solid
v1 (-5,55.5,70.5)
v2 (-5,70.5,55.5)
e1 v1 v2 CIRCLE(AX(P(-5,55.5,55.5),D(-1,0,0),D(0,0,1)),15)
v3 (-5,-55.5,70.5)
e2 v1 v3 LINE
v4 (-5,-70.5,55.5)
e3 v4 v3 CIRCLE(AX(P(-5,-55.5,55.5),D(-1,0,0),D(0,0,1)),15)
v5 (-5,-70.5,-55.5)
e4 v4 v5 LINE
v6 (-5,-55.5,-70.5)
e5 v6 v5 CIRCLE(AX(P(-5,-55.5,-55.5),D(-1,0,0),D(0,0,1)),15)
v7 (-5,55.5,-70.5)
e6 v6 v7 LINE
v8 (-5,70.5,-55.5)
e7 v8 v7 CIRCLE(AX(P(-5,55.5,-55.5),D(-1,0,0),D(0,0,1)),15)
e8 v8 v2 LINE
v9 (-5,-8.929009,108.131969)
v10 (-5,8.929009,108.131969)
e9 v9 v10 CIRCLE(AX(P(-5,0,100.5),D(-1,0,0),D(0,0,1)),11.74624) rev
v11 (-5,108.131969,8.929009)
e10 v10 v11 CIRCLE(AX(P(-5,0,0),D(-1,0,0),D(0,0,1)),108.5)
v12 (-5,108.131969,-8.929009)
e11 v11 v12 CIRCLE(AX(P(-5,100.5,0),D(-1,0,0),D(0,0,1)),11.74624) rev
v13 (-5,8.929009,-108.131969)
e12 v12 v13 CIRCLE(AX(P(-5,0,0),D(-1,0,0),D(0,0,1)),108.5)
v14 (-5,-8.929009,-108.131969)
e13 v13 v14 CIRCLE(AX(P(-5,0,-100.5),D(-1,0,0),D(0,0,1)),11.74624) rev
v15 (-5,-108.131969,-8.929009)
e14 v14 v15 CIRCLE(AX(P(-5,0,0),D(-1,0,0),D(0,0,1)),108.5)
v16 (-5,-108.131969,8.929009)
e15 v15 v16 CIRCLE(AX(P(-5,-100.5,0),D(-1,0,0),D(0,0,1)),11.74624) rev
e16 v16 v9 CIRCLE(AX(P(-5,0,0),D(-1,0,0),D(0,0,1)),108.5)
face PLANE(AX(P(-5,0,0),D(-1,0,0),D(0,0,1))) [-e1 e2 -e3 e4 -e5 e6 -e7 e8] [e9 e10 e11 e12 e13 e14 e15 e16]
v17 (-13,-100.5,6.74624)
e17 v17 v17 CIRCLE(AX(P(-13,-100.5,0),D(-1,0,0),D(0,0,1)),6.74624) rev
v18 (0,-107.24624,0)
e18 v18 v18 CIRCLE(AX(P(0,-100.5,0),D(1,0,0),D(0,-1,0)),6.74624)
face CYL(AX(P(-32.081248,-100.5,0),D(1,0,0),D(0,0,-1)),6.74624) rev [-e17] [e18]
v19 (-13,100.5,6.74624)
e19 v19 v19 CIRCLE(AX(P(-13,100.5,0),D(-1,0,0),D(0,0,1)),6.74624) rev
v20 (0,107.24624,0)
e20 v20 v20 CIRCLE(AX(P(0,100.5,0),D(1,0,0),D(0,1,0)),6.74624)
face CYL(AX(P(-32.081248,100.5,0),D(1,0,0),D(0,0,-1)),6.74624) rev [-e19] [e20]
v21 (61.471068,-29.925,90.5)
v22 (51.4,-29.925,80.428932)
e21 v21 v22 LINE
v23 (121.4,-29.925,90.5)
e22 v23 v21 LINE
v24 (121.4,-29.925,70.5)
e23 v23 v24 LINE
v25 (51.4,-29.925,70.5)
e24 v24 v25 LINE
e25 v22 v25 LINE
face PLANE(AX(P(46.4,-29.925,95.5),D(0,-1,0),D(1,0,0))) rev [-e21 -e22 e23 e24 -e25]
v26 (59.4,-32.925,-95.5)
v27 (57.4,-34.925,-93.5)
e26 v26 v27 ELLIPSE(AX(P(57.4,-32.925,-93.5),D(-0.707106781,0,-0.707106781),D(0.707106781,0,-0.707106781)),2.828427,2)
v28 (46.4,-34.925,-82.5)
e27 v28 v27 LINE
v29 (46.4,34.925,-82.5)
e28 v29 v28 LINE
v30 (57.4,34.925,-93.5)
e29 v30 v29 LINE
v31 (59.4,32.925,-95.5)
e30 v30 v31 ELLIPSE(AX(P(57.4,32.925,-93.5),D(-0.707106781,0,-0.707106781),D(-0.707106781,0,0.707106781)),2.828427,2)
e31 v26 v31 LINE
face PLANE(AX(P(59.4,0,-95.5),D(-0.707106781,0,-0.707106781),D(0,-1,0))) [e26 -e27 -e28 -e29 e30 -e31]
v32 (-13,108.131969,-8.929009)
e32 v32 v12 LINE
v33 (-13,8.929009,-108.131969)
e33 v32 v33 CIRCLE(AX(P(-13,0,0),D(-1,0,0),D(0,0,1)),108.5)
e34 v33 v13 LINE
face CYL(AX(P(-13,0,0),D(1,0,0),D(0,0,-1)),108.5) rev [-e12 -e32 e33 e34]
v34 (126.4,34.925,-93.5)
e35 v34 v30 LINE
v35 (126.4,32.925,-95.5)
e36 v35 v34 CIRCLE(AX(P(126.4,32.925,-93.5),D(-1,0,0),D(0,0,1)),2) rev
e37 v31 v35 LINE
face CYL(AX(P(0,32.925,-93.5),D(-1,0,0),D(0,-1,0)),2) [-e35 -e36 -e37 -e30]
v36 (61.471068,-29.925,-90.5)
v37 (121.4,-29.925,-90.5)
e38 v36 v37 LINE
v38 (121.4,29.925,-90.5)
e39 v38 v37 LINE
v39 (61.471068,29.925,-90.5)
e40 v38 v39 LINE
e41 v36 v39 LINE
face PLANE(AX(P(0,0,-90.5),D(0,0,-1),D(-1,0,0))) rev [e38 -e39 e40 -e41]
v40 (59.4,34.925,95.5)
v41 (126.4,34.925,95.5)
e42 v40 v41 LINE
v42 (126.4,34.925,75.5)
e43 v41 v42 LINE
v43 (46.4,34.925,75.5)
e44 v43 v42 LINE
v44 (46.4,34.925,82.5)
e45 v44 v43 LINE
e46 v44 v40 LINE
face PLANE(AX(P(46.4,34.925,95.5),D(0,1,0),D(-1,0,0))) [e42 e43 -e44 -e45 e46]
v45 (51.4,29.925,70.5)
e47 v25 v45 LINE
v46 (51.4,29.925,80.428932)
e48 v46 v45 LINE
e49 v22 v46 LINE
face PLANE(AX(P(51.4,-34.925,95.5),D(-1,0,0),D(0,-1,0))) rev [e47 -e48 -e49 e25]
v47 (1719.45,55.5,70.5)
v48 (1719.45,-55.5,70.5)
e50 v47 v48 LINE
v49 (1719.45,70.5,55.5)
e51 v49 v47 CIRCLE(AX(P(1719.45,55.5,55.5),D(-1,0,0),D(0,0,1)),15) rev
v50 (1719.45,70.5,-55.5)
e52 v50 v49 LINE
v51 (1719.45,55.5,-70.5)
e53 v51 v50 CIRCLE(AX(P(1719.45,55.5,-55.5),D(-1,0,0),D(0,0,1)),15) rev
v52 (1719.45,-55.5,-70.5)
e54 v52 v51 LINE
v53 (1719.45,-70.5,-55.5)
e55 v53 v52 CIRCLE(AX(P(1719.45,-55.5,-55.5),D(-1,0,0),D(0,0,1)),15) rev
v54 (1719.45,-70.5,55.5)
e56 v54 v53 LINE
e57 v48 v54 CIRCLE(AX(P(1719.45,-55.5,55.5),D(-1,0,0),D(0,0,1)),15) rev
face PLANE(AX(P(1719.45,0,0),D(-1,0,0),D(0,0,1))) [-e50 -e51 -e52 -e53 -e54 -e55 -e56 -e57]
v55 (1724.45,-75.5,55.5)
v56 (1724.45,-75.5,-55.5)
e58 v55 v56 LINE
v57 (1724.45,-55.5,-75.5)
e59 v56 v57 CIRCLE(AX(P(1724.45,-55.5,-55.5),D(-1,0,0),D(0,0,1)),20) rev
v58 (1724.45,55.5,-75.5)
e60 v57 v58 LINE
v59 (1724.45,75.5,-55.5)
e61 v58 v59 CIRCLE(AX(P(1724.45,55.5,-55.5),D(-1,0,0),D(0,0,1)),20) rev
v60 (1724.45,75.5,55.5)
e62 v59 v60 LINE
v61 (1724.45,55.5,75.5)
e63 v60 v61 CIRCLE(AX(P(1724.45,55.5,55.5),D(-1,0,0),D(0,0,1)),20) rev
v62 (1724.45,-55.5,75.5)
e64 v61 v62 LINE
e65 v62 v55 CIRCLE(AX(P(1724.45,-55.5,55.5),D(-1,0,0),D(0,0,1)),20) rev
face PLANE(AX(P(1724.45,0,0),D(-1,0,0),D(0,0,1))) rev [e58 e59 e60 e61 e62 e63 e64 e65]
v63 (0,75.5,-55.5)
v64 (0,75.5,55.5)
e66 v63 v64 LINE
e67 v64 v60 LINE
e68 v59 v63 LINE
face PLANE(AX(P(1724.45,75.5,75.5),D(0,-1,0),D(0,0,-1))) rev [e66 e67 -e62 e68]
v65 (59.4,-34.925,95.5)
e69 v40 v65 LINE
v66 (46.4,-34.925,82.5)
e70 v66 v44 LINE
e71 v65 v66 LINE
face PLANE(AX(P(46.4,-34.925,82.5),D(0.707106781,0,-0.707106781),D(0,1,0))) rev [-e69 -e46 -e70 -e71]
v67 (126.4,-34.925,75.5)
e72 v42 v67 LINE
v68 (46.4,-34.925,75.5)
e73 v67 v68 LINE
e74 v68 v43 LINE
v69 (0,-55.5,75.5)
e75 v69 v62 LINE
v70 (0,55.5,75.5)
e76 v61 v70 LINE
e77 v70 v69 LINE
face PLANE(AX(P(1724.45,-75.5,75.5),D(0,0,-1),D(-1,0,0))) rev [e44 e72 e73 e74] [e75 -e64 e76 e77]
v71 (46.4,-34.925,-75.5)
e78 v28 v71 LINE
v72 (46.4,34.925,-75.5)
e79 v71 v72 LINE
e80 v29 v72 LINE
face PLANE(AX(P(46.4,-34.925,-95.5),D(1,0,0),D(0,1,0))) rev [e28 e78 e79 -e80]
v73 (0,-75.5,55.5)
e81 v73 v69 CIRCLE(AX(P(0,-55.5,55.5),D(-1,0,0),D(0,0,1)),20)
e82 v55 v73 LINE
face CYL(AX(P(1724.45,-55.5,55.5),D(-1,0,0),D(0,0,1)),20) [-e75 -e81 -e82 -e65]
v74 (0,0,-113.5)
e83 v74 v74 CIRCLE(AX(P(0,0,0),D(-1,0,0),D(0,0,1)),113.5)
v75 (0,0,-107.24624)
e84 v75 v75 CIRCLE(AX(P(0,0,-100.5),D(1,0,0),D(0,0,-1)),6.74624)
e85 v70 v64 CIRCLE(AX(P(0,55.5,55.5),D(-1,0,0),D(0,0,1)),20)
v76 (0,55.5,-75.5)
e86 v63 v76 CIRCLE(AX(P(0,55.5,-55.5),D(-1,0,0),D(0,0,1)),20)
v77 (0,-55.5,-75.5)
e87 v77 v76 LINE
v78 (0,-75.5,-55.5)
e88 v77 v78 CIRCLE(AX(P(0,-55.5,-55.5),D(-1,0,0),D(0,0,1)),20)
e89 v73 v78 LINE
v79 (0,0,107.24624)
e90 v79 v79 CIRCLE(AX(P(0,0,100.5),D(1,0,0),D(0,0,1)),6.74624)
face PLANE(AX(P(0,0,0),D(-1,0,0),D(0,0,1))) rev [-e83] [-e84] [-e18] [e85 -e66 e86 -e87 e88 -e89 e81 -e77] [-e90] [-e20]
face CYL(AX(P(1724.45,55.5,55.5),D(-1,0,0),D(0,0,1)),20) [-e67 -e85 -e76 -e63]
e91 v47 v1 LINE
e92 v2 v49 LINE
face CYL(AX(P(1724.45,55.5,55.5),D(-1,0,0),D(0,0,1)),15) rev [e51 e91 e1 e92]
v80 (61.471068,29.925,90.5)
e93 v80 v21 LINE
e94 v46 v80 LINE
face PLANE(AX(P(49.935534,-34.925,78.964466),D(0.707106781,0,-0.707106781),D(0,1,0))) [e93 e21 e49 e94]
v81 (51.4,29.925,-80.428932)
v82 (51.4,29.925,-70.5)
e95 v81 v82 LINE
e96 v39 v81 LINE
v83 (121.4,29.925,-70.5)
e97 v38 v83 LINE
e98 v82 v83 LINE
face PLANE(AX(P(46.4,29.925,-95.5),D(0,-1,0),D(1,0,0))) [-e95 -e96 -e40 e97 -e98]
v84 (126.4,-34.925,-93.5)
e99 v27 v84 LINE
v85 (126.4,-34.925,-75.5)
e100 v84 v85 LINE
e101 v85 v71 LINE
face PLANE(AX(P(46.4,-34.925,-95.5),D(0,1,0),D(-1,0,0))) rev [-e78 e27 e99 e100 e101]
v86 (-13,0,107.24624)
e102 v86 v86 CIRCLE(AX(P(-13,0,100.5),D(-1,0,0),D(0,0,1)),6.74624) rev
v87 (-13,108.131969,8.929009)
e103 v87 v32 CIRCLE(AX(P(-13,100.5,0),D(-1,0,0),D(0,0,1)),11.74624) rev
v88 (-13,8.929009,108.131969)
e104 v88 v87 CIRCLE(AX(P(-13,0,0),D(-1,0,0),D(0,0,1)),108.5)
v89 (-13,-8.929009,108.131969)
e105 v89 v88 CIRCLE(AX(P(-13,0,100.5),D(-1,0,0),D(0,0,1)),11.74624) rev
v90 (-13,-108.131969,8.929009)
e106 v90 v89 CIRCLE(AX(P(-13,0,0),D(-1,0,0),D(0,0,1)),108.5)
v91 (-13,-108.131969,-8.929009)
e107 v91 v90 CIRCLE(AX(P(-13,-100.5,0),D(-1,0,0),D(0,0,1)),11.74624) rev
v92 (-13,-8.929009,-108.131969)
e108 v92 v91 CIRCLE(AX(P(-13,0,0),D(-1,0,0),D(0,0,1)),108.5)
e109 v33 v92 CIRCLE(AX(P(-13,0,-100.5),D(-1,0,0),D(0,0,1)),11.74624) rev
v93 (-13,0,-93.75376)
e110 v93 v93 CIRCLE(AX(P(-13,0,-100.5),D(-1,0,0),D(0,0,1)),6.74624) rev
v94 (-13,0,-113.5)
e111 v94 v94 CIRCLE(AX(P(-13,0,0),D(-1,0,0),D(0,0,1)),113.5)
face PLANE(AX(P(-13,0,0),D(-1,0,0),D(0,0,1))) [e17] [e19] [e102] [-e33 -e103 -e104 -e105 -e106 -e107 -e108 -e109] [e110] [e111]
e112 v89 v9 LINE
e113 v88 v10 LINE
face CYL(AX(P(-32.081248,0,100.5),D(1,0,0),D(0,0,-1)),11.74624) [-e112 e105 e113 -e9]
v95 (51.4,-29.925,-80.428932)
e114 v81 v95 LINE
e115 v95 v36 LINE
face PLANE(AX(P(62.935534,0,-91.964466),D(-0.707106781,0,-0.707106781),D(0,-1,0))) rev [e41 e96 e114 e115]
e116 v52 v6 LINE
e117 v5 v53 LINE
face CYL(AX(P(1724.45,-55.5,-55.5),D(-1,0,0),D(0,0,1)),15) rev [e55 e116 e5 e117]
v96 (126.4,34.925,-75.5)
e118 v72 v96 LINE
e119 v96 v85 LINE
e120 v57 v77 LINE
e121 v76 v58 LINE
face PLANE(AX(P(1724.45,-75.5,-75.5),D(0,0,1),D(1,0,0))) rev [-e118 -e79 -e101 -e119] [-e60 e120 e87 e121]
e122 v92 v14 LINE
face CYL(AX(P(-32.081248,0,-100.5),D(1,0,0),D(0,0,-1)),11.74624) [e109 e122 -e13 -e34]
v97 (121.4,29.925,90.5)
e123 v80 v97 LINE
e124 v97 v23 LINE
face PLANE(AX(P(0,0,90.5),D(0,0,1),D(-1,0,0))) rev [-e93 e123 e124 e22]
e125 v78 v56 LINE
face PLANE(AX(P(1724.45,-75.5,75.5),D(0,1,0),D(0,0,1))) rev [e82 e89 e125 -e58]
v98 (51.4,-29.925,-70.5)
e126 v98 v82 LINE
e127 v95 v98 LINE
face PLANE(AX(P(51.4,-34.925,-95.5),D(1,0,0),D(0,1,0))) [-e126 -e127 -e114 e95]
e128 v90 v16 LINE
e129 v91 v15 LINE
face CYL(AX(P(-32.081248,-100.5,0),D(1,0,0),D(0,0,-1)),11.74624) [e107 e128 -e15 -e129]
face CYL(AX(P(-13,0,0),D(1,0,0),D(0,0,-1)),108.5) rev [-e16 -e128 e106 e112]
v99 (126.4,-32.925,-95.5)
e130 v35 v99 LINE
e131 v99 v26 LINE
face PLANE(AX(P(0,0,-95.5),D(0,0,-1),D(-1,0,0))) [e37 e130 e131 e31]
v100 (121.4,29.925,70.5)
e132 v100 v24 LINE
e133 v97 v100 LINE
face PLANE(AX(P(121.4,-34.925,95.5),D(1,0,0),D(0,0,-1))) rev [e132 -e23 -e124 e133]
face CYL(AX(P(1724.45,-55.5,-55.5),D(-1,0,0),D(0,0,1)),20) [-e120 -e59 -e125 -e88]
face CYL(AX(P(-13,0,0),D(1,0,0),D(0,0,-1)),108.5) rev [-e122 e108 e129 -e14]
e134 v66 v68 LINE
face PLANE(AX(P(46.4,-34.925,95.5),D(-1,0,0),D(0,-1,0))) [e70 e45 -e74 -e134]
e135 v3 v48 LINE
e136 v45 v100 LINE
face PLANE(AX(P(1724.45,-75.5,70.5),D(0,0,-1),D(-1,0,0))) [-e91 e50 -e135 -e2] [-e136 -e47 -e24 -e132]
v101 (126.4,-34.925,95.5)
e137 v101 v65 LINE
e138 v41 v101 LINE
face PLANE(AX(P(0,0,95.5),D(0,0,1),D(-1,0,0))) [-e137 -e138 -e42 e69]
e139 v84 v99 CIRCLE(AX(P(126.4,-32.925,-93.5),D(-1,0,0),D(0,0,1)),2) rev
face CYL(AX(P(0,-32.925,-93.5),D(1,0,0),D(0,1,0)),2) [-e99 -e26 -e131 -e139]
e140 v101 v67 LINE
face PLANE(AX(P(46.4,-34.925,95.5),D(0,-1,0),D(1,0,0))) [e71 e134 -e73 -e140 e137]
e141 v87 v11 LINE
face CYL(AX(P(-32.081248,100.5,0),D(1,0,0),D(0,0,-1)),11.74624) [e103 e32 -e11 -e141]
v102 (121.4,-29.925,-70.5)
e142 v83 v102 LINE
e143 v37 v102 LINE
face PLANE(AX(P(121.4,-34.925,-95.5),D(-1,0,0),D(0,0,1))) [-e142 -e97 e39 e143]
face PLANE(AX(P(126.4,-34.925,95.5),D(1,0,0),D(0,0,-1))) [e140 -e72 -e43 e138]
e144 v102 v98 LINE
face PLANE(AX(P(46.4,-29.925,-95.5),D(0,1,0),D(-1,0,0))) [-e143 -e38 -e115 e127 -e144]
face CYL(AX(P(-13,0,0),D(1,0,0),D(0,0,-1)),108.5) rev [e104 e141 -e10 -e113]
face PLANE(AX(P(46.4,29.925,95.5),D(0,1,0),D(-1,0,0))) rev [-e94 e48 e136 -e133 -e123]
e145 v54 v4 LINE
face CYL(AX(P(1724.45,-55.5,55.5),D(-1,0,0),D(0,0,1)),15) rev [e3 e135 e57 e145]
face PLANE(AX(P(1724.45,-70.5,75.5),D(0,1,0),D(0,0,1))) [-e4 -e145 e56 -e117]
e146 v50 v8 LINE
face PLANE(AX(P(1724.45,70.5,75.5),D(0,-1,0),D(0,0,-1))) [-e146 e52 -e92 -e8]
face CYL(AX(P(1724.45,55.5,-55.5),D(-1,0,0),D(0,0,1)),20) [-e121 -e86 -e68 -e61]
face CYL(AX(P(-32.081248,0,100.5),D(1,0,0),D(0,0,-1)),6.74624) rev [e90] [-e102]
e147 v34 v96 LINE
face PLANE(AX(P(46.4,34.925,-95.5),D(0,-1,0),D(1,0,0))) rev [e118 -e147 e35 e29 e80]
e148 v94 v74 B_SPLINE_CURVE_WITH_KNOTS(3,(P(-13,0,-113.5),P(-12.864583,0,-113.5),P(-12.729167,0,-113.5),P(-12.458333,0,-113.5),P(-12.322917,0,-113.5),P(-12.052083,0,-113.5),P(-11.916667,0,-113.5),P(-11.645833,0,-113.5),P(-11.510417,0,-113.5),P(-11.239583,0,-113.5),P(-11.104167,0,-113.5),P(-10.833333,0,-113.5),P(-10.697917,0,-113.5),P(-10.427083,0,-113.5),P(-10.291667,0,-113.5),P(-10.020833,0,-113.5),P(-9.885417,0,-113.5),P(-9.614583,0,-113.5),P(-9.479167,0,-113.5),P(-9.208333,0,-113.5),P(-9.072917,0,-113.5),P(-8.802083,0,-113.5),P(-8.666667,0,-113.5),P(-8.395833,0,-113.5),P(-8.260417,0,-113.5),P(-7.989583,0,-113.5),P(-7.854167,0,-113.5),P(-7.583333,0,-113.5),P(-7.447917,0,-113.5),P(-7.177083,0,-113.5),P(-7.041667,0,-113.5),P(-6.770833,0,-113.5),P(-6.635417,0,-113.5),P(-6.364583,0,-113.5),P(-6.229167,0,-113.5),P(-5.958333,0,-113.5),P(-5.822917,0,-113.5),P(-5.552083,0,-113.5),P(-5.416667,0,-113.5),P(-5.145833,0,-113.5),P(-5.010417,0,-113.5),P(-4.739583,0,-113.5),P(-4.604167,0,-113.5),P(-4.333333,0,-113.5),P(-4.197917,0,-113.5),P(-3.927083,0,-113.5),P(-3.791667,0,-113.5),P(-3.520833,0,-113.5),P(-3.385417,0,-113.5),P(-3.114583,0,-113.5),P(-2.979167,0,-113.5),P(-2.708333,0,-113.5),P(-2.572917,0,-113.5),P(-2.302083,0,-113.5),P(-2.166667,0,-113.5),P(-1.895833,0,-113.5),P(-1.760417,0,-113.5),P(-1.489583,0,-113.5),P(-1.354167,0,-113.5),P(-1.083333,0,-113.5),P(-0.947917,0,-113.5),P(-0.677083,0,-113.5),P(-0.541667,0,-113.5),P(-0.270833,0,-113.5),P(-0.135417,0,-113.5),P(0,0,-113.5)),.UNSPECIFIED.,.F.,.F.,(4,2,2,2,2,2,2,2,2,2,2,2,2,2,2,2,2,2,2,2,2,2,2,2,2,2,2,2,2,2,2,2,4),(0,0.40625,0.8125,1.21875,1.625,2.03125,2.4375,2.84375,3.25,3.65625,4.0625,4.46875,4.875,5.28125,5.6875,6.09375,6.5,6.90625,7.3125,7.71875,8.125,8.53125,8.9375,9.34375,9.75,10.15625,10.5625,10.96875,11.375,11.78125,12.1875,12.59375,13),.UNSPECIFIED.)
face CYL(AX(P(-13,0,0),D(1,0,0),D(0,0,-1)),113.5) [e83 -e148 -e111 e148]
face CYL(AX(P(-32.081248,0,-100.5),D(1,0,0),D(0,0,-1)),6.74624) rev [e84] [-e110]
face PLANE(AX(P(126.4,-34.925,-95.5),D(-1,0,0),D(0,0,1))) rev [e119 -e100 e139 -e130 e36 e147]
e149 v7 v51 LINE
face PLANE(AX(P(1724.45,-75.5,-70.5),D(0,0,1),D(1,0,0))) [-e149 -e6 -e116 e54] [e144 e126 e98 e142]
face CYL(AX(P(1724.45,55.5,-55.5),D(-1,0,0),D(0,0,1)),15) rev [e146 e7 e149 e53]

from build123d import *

# Parameters (mm, degrees)
SKETCH3_W                = 151
SKETCH3_H                = 151
BOSS_EXTRUDE2_DEPTH      = 1724.45
SKETCH4_R                = 113.5
BOSS_EXTRUDE3_DEPTH      = 13
SKETCH5_R                = 6.74624
CUT_EXTRUDE1_DEPTH       = 13
CIRPATTERN1_COUNT        = 4
FILLET1_R                = 20
SKETCH6_W                = 80
SKETCH6_H                = 69.85
BOSS_EXTRUDE4_DEPTH      = 20
CHAMFER1_SIZE            = 13
FILLET2_R                = 2
CHAMFER1_OF_MIRROR1_SIZE = 13
SHELL1_START             = -13
SHELL1_DEPTH             = 1732.45
SHELL1_START_2           = 61.471067812
SHELL1_2_OUTLINE_W       = 59.85
SHELL1_2_OUTLINE_H       = 20
SHELL1_2_DEPTH           = 59.928932188
SHELL1_3_DEPTH           = 8
SHELL1_START_3           = -29.925
SHELL1_4_DEPTH           = 59.85


with BuildPart() as part:
    # Sketch3 → Boss-Extrude2 (new body)
    with BuildSketch(Plane(origin=(0, 0, 0), x_dir=(0, 0, -1), z_dir=(1, 0, 0))):
        Rectangle(SKETCH3_W, SKETCH3_H)
    extrude(amount=BOSS_EXTRUDE2_DEPTH)

    # Sketch4 → Boss-Extrude3 (add)
    with BuildSketch(Plane.ZY):
        with Locations(Location((0, 0, 0), (0, 0, 180))):
            Circle(SKETCH4_R)
    extrude(amount=BOSS_EXTRUDE3_DEPTH)

    # Sketch5 → Cut-Extrude1 (cut)
    with BuildSketch(Plane(origin=(0, 0, 0), x_dir=(0, 0, -1), z_dir=(1, 0, 0))):
        with Locations((100.5, 0)):
            Circle(SKETCH5_R)
    cut_extrude1 = extrude(amount=-CUT_EXTRUDE1_DEPTH, mode=Mode.SUBTRACT)

    # CirPattern1: Cut-Extrude1 ×4 about axis
    cirpattern1_axis = Axis((0, 0, 0), (1, 0, 0))
    for i in range(1, CIRPATTERN1_COUNT):
        add(cut_extrude1.rotate(cirpattern1_axis, i * 360 / CIRPATTERN1_COUNT), mode=Mode.SUBTRACT)

    # Fillet1
    fillet1_edges = [part.edges().sort_by_distance(p)[0] for p in [
        (862.225, -75.5, -75.5),
        (862.225, -75.5, 75.5),
        (862.225, 75.5, 75.5),
        (862.225, 75.5, -75.5),
    ]]
    fillet(fillet1_edges, radius=FILLET1_R)

    # Sketch6 → Boss-Extrude4 (add)
    with BuildSketch(Plane(origin=(0, 0, -75.5), x_dir=(-1, 0, 0), z_dir=(0, 0, -1))):
        with Locations((-86.4, 0)):
            Rectangle(SKETCH6_W, SKETCH6_H)
    boss_extrude4 = extrude(amount=BOSS_EXTRUDE4_DEPTH)

    # Chamfer1
    chamfer1_edges = [part.edges().sort_by_distance(p)[0] for p in [
        (46.4, 0, -95.5),
    ]]
    chamfer(chamfer1_edges, length=CHAMFER1_SIZE)

    # Fillet2
    fillet2_edges = [part.edges().sort_by_distance(p)[0] for p in [
        (92.9, -34.925, -95.5),
        (92.9, 34.925, -95.5),
    ]]
    fillet(fillet2_edges, radius=FILLET2_R)

    # Mirror1: Boss-Extrude4 across plane
    add(boss_extrude4.mirror(Plane.XY))

    # Chamfer1 of Mirror1
    chamfer1_of_mirror1_edges = [part.edges().sort_by_distance(p)[0] for p in [
        (46.4, 0, 95.5),
    ]]
    chamfer(chamfer1_of_mirror1_edges, length=CHAMFER1_OF_MIRROR1_SIZE)

    # Shell1: read off the stored shape, not the designer's step
    # Shell1 outline → Shell1 (cut)
    with BuildSketch(Plane.YZ.offset(SHELL1_START)):
        with BuildLine():
            Line((55.5, 70.5), (-55.5, 70.5))
            ThreePointArc((-55.5, 70.5), (-66.106601718, 66.106601718), (-70.5, 55.5))
            Line((-70.5, 55.5), (-70.5, -55.5))
            ThreePointArc((-70.5, -55.5), (-66.106601718, -66.106601718), (-55.5, -70.5))
            Line((-55.5, -70.5), (55.5, -70.5))
            ThreePointArc((55.5, -70.5), (66.106601718, -66.106601718), (70.5, -55.5))
            Line((70.5, -55.5), (70.5, 55.5))
            ThreePointArc((70.5, 55.5), (66.106601718, 66.106601718), (55.5, 70.5))
        make_face()
    extrude(amount=SHELL1_DEPTH, mode=Mode.SUBTRACT)

    # Shell1 2 outline → Shell1 2 (cut)
    with BuildSketch(Plane.YZ.offset(SHELL1_START_2)):
        with Locations((0, 80.5)):
            Rectangle(SHELL1_2_OUTLINE_W, SHELL1_2_OUTLINE_H)
        with Locations((0, -80.5)):
            Rectangle(SHELL1_2_OUTLINE_W, SHELL1_2_OUTLINE_H)
    extrude(amount=SHELL1_2_DEPTH, mode=Mode.SUBTRACT)

    # Shell1 3 outline → Shell1 3 (cut)
    with BuildSketch(Plane.YZ.offset(SHELL1_START)):
        with BuildLine():
            ThreePointArc((108.131969382, -8.929008763), (88.75376, 0), (108.131969382, 8.929008763))
            ThreePointArc((108.131969382, 8.929008763), (76.721085759, 76.721085759), (8.929008763, 108.131969382))
            ThreePointArc((8.929008763, 108.131969382), (0, 88.75376), (-8.929008763, 108.131969382))
            ThreePointArc((-8.929008763, 108.131969382), (-76.721085759, 76.721085759), (-108.131969382, 8.929008763))
            ThreePointArc((-108.131969382, 8.929008763), (-88.75376, 0), (-108.131969382, -8.929008763))
            ThreePointArc((-108.131969382, -8.929008763), (-76.721085759, -76.721085759), (-8.929008763, -108.131969382))
            ThreePointArc((-8.929008763, -108.131969382), (0, -88.75376), (8.929008763, -108.131969382))
            ThreePointArc((8.929008763, -108.131969382), (76.721085759, -76.721085759), (108.131969382, -8.929008763))
        make_face()
        with BuildLine():
            Line((55.5, -70.5), (-55.5, -70.5))
            ThreePointArc((-55.5, -70.5), (-66.106601718, -66.106601718), (-70.5, -55.5))
            Line((-70.5, -55.5), (-70.5, 55.5))
            ThreePointArc((-70.5, 55.5), (-66.106601718, 66.106601718), (-55.5, 70.5))
            Line((-55.5, 70.5), (55.5, 70.5))
            ThreePointArc((55.5, 70.5), (66.106601718, 66.106601718), (70.5, 55.5))
            Line((70.5, 55.5), (70.5, -55.5))
            ThreePointArc((70.5, -55.5), (66.106601718, -66.106601718), (55.5, -70.5))
        make_face(mode=Mode.SUBTRACT)
    extrude(amount=SHELL1_3_DEPTH, mode=Mode.SUBTRACT)

    # Shell1 4 outline → Shell1 4 (cut)
    with BuildSketch(Plane(origin=(0, 0, 0), x_dir=(1, 0, 0), z_dir=(0, 1, 0)).offset(SHELL1_START_3)):
        Polygon((51.4, 80.428932188), (51.4, 70.5), (61.471067812, 70.5), (61.471067812, 90.5), align=None)
        Polygon((61.471067812, -70.5), (51.4, -70.5), (51.4, -80.428932188), (61.471067812, -90.5), align=None)
    extrude(amount=SHELL1_4_DEPTH, mode=Mode.SUBTRACT)


solid = part.part
